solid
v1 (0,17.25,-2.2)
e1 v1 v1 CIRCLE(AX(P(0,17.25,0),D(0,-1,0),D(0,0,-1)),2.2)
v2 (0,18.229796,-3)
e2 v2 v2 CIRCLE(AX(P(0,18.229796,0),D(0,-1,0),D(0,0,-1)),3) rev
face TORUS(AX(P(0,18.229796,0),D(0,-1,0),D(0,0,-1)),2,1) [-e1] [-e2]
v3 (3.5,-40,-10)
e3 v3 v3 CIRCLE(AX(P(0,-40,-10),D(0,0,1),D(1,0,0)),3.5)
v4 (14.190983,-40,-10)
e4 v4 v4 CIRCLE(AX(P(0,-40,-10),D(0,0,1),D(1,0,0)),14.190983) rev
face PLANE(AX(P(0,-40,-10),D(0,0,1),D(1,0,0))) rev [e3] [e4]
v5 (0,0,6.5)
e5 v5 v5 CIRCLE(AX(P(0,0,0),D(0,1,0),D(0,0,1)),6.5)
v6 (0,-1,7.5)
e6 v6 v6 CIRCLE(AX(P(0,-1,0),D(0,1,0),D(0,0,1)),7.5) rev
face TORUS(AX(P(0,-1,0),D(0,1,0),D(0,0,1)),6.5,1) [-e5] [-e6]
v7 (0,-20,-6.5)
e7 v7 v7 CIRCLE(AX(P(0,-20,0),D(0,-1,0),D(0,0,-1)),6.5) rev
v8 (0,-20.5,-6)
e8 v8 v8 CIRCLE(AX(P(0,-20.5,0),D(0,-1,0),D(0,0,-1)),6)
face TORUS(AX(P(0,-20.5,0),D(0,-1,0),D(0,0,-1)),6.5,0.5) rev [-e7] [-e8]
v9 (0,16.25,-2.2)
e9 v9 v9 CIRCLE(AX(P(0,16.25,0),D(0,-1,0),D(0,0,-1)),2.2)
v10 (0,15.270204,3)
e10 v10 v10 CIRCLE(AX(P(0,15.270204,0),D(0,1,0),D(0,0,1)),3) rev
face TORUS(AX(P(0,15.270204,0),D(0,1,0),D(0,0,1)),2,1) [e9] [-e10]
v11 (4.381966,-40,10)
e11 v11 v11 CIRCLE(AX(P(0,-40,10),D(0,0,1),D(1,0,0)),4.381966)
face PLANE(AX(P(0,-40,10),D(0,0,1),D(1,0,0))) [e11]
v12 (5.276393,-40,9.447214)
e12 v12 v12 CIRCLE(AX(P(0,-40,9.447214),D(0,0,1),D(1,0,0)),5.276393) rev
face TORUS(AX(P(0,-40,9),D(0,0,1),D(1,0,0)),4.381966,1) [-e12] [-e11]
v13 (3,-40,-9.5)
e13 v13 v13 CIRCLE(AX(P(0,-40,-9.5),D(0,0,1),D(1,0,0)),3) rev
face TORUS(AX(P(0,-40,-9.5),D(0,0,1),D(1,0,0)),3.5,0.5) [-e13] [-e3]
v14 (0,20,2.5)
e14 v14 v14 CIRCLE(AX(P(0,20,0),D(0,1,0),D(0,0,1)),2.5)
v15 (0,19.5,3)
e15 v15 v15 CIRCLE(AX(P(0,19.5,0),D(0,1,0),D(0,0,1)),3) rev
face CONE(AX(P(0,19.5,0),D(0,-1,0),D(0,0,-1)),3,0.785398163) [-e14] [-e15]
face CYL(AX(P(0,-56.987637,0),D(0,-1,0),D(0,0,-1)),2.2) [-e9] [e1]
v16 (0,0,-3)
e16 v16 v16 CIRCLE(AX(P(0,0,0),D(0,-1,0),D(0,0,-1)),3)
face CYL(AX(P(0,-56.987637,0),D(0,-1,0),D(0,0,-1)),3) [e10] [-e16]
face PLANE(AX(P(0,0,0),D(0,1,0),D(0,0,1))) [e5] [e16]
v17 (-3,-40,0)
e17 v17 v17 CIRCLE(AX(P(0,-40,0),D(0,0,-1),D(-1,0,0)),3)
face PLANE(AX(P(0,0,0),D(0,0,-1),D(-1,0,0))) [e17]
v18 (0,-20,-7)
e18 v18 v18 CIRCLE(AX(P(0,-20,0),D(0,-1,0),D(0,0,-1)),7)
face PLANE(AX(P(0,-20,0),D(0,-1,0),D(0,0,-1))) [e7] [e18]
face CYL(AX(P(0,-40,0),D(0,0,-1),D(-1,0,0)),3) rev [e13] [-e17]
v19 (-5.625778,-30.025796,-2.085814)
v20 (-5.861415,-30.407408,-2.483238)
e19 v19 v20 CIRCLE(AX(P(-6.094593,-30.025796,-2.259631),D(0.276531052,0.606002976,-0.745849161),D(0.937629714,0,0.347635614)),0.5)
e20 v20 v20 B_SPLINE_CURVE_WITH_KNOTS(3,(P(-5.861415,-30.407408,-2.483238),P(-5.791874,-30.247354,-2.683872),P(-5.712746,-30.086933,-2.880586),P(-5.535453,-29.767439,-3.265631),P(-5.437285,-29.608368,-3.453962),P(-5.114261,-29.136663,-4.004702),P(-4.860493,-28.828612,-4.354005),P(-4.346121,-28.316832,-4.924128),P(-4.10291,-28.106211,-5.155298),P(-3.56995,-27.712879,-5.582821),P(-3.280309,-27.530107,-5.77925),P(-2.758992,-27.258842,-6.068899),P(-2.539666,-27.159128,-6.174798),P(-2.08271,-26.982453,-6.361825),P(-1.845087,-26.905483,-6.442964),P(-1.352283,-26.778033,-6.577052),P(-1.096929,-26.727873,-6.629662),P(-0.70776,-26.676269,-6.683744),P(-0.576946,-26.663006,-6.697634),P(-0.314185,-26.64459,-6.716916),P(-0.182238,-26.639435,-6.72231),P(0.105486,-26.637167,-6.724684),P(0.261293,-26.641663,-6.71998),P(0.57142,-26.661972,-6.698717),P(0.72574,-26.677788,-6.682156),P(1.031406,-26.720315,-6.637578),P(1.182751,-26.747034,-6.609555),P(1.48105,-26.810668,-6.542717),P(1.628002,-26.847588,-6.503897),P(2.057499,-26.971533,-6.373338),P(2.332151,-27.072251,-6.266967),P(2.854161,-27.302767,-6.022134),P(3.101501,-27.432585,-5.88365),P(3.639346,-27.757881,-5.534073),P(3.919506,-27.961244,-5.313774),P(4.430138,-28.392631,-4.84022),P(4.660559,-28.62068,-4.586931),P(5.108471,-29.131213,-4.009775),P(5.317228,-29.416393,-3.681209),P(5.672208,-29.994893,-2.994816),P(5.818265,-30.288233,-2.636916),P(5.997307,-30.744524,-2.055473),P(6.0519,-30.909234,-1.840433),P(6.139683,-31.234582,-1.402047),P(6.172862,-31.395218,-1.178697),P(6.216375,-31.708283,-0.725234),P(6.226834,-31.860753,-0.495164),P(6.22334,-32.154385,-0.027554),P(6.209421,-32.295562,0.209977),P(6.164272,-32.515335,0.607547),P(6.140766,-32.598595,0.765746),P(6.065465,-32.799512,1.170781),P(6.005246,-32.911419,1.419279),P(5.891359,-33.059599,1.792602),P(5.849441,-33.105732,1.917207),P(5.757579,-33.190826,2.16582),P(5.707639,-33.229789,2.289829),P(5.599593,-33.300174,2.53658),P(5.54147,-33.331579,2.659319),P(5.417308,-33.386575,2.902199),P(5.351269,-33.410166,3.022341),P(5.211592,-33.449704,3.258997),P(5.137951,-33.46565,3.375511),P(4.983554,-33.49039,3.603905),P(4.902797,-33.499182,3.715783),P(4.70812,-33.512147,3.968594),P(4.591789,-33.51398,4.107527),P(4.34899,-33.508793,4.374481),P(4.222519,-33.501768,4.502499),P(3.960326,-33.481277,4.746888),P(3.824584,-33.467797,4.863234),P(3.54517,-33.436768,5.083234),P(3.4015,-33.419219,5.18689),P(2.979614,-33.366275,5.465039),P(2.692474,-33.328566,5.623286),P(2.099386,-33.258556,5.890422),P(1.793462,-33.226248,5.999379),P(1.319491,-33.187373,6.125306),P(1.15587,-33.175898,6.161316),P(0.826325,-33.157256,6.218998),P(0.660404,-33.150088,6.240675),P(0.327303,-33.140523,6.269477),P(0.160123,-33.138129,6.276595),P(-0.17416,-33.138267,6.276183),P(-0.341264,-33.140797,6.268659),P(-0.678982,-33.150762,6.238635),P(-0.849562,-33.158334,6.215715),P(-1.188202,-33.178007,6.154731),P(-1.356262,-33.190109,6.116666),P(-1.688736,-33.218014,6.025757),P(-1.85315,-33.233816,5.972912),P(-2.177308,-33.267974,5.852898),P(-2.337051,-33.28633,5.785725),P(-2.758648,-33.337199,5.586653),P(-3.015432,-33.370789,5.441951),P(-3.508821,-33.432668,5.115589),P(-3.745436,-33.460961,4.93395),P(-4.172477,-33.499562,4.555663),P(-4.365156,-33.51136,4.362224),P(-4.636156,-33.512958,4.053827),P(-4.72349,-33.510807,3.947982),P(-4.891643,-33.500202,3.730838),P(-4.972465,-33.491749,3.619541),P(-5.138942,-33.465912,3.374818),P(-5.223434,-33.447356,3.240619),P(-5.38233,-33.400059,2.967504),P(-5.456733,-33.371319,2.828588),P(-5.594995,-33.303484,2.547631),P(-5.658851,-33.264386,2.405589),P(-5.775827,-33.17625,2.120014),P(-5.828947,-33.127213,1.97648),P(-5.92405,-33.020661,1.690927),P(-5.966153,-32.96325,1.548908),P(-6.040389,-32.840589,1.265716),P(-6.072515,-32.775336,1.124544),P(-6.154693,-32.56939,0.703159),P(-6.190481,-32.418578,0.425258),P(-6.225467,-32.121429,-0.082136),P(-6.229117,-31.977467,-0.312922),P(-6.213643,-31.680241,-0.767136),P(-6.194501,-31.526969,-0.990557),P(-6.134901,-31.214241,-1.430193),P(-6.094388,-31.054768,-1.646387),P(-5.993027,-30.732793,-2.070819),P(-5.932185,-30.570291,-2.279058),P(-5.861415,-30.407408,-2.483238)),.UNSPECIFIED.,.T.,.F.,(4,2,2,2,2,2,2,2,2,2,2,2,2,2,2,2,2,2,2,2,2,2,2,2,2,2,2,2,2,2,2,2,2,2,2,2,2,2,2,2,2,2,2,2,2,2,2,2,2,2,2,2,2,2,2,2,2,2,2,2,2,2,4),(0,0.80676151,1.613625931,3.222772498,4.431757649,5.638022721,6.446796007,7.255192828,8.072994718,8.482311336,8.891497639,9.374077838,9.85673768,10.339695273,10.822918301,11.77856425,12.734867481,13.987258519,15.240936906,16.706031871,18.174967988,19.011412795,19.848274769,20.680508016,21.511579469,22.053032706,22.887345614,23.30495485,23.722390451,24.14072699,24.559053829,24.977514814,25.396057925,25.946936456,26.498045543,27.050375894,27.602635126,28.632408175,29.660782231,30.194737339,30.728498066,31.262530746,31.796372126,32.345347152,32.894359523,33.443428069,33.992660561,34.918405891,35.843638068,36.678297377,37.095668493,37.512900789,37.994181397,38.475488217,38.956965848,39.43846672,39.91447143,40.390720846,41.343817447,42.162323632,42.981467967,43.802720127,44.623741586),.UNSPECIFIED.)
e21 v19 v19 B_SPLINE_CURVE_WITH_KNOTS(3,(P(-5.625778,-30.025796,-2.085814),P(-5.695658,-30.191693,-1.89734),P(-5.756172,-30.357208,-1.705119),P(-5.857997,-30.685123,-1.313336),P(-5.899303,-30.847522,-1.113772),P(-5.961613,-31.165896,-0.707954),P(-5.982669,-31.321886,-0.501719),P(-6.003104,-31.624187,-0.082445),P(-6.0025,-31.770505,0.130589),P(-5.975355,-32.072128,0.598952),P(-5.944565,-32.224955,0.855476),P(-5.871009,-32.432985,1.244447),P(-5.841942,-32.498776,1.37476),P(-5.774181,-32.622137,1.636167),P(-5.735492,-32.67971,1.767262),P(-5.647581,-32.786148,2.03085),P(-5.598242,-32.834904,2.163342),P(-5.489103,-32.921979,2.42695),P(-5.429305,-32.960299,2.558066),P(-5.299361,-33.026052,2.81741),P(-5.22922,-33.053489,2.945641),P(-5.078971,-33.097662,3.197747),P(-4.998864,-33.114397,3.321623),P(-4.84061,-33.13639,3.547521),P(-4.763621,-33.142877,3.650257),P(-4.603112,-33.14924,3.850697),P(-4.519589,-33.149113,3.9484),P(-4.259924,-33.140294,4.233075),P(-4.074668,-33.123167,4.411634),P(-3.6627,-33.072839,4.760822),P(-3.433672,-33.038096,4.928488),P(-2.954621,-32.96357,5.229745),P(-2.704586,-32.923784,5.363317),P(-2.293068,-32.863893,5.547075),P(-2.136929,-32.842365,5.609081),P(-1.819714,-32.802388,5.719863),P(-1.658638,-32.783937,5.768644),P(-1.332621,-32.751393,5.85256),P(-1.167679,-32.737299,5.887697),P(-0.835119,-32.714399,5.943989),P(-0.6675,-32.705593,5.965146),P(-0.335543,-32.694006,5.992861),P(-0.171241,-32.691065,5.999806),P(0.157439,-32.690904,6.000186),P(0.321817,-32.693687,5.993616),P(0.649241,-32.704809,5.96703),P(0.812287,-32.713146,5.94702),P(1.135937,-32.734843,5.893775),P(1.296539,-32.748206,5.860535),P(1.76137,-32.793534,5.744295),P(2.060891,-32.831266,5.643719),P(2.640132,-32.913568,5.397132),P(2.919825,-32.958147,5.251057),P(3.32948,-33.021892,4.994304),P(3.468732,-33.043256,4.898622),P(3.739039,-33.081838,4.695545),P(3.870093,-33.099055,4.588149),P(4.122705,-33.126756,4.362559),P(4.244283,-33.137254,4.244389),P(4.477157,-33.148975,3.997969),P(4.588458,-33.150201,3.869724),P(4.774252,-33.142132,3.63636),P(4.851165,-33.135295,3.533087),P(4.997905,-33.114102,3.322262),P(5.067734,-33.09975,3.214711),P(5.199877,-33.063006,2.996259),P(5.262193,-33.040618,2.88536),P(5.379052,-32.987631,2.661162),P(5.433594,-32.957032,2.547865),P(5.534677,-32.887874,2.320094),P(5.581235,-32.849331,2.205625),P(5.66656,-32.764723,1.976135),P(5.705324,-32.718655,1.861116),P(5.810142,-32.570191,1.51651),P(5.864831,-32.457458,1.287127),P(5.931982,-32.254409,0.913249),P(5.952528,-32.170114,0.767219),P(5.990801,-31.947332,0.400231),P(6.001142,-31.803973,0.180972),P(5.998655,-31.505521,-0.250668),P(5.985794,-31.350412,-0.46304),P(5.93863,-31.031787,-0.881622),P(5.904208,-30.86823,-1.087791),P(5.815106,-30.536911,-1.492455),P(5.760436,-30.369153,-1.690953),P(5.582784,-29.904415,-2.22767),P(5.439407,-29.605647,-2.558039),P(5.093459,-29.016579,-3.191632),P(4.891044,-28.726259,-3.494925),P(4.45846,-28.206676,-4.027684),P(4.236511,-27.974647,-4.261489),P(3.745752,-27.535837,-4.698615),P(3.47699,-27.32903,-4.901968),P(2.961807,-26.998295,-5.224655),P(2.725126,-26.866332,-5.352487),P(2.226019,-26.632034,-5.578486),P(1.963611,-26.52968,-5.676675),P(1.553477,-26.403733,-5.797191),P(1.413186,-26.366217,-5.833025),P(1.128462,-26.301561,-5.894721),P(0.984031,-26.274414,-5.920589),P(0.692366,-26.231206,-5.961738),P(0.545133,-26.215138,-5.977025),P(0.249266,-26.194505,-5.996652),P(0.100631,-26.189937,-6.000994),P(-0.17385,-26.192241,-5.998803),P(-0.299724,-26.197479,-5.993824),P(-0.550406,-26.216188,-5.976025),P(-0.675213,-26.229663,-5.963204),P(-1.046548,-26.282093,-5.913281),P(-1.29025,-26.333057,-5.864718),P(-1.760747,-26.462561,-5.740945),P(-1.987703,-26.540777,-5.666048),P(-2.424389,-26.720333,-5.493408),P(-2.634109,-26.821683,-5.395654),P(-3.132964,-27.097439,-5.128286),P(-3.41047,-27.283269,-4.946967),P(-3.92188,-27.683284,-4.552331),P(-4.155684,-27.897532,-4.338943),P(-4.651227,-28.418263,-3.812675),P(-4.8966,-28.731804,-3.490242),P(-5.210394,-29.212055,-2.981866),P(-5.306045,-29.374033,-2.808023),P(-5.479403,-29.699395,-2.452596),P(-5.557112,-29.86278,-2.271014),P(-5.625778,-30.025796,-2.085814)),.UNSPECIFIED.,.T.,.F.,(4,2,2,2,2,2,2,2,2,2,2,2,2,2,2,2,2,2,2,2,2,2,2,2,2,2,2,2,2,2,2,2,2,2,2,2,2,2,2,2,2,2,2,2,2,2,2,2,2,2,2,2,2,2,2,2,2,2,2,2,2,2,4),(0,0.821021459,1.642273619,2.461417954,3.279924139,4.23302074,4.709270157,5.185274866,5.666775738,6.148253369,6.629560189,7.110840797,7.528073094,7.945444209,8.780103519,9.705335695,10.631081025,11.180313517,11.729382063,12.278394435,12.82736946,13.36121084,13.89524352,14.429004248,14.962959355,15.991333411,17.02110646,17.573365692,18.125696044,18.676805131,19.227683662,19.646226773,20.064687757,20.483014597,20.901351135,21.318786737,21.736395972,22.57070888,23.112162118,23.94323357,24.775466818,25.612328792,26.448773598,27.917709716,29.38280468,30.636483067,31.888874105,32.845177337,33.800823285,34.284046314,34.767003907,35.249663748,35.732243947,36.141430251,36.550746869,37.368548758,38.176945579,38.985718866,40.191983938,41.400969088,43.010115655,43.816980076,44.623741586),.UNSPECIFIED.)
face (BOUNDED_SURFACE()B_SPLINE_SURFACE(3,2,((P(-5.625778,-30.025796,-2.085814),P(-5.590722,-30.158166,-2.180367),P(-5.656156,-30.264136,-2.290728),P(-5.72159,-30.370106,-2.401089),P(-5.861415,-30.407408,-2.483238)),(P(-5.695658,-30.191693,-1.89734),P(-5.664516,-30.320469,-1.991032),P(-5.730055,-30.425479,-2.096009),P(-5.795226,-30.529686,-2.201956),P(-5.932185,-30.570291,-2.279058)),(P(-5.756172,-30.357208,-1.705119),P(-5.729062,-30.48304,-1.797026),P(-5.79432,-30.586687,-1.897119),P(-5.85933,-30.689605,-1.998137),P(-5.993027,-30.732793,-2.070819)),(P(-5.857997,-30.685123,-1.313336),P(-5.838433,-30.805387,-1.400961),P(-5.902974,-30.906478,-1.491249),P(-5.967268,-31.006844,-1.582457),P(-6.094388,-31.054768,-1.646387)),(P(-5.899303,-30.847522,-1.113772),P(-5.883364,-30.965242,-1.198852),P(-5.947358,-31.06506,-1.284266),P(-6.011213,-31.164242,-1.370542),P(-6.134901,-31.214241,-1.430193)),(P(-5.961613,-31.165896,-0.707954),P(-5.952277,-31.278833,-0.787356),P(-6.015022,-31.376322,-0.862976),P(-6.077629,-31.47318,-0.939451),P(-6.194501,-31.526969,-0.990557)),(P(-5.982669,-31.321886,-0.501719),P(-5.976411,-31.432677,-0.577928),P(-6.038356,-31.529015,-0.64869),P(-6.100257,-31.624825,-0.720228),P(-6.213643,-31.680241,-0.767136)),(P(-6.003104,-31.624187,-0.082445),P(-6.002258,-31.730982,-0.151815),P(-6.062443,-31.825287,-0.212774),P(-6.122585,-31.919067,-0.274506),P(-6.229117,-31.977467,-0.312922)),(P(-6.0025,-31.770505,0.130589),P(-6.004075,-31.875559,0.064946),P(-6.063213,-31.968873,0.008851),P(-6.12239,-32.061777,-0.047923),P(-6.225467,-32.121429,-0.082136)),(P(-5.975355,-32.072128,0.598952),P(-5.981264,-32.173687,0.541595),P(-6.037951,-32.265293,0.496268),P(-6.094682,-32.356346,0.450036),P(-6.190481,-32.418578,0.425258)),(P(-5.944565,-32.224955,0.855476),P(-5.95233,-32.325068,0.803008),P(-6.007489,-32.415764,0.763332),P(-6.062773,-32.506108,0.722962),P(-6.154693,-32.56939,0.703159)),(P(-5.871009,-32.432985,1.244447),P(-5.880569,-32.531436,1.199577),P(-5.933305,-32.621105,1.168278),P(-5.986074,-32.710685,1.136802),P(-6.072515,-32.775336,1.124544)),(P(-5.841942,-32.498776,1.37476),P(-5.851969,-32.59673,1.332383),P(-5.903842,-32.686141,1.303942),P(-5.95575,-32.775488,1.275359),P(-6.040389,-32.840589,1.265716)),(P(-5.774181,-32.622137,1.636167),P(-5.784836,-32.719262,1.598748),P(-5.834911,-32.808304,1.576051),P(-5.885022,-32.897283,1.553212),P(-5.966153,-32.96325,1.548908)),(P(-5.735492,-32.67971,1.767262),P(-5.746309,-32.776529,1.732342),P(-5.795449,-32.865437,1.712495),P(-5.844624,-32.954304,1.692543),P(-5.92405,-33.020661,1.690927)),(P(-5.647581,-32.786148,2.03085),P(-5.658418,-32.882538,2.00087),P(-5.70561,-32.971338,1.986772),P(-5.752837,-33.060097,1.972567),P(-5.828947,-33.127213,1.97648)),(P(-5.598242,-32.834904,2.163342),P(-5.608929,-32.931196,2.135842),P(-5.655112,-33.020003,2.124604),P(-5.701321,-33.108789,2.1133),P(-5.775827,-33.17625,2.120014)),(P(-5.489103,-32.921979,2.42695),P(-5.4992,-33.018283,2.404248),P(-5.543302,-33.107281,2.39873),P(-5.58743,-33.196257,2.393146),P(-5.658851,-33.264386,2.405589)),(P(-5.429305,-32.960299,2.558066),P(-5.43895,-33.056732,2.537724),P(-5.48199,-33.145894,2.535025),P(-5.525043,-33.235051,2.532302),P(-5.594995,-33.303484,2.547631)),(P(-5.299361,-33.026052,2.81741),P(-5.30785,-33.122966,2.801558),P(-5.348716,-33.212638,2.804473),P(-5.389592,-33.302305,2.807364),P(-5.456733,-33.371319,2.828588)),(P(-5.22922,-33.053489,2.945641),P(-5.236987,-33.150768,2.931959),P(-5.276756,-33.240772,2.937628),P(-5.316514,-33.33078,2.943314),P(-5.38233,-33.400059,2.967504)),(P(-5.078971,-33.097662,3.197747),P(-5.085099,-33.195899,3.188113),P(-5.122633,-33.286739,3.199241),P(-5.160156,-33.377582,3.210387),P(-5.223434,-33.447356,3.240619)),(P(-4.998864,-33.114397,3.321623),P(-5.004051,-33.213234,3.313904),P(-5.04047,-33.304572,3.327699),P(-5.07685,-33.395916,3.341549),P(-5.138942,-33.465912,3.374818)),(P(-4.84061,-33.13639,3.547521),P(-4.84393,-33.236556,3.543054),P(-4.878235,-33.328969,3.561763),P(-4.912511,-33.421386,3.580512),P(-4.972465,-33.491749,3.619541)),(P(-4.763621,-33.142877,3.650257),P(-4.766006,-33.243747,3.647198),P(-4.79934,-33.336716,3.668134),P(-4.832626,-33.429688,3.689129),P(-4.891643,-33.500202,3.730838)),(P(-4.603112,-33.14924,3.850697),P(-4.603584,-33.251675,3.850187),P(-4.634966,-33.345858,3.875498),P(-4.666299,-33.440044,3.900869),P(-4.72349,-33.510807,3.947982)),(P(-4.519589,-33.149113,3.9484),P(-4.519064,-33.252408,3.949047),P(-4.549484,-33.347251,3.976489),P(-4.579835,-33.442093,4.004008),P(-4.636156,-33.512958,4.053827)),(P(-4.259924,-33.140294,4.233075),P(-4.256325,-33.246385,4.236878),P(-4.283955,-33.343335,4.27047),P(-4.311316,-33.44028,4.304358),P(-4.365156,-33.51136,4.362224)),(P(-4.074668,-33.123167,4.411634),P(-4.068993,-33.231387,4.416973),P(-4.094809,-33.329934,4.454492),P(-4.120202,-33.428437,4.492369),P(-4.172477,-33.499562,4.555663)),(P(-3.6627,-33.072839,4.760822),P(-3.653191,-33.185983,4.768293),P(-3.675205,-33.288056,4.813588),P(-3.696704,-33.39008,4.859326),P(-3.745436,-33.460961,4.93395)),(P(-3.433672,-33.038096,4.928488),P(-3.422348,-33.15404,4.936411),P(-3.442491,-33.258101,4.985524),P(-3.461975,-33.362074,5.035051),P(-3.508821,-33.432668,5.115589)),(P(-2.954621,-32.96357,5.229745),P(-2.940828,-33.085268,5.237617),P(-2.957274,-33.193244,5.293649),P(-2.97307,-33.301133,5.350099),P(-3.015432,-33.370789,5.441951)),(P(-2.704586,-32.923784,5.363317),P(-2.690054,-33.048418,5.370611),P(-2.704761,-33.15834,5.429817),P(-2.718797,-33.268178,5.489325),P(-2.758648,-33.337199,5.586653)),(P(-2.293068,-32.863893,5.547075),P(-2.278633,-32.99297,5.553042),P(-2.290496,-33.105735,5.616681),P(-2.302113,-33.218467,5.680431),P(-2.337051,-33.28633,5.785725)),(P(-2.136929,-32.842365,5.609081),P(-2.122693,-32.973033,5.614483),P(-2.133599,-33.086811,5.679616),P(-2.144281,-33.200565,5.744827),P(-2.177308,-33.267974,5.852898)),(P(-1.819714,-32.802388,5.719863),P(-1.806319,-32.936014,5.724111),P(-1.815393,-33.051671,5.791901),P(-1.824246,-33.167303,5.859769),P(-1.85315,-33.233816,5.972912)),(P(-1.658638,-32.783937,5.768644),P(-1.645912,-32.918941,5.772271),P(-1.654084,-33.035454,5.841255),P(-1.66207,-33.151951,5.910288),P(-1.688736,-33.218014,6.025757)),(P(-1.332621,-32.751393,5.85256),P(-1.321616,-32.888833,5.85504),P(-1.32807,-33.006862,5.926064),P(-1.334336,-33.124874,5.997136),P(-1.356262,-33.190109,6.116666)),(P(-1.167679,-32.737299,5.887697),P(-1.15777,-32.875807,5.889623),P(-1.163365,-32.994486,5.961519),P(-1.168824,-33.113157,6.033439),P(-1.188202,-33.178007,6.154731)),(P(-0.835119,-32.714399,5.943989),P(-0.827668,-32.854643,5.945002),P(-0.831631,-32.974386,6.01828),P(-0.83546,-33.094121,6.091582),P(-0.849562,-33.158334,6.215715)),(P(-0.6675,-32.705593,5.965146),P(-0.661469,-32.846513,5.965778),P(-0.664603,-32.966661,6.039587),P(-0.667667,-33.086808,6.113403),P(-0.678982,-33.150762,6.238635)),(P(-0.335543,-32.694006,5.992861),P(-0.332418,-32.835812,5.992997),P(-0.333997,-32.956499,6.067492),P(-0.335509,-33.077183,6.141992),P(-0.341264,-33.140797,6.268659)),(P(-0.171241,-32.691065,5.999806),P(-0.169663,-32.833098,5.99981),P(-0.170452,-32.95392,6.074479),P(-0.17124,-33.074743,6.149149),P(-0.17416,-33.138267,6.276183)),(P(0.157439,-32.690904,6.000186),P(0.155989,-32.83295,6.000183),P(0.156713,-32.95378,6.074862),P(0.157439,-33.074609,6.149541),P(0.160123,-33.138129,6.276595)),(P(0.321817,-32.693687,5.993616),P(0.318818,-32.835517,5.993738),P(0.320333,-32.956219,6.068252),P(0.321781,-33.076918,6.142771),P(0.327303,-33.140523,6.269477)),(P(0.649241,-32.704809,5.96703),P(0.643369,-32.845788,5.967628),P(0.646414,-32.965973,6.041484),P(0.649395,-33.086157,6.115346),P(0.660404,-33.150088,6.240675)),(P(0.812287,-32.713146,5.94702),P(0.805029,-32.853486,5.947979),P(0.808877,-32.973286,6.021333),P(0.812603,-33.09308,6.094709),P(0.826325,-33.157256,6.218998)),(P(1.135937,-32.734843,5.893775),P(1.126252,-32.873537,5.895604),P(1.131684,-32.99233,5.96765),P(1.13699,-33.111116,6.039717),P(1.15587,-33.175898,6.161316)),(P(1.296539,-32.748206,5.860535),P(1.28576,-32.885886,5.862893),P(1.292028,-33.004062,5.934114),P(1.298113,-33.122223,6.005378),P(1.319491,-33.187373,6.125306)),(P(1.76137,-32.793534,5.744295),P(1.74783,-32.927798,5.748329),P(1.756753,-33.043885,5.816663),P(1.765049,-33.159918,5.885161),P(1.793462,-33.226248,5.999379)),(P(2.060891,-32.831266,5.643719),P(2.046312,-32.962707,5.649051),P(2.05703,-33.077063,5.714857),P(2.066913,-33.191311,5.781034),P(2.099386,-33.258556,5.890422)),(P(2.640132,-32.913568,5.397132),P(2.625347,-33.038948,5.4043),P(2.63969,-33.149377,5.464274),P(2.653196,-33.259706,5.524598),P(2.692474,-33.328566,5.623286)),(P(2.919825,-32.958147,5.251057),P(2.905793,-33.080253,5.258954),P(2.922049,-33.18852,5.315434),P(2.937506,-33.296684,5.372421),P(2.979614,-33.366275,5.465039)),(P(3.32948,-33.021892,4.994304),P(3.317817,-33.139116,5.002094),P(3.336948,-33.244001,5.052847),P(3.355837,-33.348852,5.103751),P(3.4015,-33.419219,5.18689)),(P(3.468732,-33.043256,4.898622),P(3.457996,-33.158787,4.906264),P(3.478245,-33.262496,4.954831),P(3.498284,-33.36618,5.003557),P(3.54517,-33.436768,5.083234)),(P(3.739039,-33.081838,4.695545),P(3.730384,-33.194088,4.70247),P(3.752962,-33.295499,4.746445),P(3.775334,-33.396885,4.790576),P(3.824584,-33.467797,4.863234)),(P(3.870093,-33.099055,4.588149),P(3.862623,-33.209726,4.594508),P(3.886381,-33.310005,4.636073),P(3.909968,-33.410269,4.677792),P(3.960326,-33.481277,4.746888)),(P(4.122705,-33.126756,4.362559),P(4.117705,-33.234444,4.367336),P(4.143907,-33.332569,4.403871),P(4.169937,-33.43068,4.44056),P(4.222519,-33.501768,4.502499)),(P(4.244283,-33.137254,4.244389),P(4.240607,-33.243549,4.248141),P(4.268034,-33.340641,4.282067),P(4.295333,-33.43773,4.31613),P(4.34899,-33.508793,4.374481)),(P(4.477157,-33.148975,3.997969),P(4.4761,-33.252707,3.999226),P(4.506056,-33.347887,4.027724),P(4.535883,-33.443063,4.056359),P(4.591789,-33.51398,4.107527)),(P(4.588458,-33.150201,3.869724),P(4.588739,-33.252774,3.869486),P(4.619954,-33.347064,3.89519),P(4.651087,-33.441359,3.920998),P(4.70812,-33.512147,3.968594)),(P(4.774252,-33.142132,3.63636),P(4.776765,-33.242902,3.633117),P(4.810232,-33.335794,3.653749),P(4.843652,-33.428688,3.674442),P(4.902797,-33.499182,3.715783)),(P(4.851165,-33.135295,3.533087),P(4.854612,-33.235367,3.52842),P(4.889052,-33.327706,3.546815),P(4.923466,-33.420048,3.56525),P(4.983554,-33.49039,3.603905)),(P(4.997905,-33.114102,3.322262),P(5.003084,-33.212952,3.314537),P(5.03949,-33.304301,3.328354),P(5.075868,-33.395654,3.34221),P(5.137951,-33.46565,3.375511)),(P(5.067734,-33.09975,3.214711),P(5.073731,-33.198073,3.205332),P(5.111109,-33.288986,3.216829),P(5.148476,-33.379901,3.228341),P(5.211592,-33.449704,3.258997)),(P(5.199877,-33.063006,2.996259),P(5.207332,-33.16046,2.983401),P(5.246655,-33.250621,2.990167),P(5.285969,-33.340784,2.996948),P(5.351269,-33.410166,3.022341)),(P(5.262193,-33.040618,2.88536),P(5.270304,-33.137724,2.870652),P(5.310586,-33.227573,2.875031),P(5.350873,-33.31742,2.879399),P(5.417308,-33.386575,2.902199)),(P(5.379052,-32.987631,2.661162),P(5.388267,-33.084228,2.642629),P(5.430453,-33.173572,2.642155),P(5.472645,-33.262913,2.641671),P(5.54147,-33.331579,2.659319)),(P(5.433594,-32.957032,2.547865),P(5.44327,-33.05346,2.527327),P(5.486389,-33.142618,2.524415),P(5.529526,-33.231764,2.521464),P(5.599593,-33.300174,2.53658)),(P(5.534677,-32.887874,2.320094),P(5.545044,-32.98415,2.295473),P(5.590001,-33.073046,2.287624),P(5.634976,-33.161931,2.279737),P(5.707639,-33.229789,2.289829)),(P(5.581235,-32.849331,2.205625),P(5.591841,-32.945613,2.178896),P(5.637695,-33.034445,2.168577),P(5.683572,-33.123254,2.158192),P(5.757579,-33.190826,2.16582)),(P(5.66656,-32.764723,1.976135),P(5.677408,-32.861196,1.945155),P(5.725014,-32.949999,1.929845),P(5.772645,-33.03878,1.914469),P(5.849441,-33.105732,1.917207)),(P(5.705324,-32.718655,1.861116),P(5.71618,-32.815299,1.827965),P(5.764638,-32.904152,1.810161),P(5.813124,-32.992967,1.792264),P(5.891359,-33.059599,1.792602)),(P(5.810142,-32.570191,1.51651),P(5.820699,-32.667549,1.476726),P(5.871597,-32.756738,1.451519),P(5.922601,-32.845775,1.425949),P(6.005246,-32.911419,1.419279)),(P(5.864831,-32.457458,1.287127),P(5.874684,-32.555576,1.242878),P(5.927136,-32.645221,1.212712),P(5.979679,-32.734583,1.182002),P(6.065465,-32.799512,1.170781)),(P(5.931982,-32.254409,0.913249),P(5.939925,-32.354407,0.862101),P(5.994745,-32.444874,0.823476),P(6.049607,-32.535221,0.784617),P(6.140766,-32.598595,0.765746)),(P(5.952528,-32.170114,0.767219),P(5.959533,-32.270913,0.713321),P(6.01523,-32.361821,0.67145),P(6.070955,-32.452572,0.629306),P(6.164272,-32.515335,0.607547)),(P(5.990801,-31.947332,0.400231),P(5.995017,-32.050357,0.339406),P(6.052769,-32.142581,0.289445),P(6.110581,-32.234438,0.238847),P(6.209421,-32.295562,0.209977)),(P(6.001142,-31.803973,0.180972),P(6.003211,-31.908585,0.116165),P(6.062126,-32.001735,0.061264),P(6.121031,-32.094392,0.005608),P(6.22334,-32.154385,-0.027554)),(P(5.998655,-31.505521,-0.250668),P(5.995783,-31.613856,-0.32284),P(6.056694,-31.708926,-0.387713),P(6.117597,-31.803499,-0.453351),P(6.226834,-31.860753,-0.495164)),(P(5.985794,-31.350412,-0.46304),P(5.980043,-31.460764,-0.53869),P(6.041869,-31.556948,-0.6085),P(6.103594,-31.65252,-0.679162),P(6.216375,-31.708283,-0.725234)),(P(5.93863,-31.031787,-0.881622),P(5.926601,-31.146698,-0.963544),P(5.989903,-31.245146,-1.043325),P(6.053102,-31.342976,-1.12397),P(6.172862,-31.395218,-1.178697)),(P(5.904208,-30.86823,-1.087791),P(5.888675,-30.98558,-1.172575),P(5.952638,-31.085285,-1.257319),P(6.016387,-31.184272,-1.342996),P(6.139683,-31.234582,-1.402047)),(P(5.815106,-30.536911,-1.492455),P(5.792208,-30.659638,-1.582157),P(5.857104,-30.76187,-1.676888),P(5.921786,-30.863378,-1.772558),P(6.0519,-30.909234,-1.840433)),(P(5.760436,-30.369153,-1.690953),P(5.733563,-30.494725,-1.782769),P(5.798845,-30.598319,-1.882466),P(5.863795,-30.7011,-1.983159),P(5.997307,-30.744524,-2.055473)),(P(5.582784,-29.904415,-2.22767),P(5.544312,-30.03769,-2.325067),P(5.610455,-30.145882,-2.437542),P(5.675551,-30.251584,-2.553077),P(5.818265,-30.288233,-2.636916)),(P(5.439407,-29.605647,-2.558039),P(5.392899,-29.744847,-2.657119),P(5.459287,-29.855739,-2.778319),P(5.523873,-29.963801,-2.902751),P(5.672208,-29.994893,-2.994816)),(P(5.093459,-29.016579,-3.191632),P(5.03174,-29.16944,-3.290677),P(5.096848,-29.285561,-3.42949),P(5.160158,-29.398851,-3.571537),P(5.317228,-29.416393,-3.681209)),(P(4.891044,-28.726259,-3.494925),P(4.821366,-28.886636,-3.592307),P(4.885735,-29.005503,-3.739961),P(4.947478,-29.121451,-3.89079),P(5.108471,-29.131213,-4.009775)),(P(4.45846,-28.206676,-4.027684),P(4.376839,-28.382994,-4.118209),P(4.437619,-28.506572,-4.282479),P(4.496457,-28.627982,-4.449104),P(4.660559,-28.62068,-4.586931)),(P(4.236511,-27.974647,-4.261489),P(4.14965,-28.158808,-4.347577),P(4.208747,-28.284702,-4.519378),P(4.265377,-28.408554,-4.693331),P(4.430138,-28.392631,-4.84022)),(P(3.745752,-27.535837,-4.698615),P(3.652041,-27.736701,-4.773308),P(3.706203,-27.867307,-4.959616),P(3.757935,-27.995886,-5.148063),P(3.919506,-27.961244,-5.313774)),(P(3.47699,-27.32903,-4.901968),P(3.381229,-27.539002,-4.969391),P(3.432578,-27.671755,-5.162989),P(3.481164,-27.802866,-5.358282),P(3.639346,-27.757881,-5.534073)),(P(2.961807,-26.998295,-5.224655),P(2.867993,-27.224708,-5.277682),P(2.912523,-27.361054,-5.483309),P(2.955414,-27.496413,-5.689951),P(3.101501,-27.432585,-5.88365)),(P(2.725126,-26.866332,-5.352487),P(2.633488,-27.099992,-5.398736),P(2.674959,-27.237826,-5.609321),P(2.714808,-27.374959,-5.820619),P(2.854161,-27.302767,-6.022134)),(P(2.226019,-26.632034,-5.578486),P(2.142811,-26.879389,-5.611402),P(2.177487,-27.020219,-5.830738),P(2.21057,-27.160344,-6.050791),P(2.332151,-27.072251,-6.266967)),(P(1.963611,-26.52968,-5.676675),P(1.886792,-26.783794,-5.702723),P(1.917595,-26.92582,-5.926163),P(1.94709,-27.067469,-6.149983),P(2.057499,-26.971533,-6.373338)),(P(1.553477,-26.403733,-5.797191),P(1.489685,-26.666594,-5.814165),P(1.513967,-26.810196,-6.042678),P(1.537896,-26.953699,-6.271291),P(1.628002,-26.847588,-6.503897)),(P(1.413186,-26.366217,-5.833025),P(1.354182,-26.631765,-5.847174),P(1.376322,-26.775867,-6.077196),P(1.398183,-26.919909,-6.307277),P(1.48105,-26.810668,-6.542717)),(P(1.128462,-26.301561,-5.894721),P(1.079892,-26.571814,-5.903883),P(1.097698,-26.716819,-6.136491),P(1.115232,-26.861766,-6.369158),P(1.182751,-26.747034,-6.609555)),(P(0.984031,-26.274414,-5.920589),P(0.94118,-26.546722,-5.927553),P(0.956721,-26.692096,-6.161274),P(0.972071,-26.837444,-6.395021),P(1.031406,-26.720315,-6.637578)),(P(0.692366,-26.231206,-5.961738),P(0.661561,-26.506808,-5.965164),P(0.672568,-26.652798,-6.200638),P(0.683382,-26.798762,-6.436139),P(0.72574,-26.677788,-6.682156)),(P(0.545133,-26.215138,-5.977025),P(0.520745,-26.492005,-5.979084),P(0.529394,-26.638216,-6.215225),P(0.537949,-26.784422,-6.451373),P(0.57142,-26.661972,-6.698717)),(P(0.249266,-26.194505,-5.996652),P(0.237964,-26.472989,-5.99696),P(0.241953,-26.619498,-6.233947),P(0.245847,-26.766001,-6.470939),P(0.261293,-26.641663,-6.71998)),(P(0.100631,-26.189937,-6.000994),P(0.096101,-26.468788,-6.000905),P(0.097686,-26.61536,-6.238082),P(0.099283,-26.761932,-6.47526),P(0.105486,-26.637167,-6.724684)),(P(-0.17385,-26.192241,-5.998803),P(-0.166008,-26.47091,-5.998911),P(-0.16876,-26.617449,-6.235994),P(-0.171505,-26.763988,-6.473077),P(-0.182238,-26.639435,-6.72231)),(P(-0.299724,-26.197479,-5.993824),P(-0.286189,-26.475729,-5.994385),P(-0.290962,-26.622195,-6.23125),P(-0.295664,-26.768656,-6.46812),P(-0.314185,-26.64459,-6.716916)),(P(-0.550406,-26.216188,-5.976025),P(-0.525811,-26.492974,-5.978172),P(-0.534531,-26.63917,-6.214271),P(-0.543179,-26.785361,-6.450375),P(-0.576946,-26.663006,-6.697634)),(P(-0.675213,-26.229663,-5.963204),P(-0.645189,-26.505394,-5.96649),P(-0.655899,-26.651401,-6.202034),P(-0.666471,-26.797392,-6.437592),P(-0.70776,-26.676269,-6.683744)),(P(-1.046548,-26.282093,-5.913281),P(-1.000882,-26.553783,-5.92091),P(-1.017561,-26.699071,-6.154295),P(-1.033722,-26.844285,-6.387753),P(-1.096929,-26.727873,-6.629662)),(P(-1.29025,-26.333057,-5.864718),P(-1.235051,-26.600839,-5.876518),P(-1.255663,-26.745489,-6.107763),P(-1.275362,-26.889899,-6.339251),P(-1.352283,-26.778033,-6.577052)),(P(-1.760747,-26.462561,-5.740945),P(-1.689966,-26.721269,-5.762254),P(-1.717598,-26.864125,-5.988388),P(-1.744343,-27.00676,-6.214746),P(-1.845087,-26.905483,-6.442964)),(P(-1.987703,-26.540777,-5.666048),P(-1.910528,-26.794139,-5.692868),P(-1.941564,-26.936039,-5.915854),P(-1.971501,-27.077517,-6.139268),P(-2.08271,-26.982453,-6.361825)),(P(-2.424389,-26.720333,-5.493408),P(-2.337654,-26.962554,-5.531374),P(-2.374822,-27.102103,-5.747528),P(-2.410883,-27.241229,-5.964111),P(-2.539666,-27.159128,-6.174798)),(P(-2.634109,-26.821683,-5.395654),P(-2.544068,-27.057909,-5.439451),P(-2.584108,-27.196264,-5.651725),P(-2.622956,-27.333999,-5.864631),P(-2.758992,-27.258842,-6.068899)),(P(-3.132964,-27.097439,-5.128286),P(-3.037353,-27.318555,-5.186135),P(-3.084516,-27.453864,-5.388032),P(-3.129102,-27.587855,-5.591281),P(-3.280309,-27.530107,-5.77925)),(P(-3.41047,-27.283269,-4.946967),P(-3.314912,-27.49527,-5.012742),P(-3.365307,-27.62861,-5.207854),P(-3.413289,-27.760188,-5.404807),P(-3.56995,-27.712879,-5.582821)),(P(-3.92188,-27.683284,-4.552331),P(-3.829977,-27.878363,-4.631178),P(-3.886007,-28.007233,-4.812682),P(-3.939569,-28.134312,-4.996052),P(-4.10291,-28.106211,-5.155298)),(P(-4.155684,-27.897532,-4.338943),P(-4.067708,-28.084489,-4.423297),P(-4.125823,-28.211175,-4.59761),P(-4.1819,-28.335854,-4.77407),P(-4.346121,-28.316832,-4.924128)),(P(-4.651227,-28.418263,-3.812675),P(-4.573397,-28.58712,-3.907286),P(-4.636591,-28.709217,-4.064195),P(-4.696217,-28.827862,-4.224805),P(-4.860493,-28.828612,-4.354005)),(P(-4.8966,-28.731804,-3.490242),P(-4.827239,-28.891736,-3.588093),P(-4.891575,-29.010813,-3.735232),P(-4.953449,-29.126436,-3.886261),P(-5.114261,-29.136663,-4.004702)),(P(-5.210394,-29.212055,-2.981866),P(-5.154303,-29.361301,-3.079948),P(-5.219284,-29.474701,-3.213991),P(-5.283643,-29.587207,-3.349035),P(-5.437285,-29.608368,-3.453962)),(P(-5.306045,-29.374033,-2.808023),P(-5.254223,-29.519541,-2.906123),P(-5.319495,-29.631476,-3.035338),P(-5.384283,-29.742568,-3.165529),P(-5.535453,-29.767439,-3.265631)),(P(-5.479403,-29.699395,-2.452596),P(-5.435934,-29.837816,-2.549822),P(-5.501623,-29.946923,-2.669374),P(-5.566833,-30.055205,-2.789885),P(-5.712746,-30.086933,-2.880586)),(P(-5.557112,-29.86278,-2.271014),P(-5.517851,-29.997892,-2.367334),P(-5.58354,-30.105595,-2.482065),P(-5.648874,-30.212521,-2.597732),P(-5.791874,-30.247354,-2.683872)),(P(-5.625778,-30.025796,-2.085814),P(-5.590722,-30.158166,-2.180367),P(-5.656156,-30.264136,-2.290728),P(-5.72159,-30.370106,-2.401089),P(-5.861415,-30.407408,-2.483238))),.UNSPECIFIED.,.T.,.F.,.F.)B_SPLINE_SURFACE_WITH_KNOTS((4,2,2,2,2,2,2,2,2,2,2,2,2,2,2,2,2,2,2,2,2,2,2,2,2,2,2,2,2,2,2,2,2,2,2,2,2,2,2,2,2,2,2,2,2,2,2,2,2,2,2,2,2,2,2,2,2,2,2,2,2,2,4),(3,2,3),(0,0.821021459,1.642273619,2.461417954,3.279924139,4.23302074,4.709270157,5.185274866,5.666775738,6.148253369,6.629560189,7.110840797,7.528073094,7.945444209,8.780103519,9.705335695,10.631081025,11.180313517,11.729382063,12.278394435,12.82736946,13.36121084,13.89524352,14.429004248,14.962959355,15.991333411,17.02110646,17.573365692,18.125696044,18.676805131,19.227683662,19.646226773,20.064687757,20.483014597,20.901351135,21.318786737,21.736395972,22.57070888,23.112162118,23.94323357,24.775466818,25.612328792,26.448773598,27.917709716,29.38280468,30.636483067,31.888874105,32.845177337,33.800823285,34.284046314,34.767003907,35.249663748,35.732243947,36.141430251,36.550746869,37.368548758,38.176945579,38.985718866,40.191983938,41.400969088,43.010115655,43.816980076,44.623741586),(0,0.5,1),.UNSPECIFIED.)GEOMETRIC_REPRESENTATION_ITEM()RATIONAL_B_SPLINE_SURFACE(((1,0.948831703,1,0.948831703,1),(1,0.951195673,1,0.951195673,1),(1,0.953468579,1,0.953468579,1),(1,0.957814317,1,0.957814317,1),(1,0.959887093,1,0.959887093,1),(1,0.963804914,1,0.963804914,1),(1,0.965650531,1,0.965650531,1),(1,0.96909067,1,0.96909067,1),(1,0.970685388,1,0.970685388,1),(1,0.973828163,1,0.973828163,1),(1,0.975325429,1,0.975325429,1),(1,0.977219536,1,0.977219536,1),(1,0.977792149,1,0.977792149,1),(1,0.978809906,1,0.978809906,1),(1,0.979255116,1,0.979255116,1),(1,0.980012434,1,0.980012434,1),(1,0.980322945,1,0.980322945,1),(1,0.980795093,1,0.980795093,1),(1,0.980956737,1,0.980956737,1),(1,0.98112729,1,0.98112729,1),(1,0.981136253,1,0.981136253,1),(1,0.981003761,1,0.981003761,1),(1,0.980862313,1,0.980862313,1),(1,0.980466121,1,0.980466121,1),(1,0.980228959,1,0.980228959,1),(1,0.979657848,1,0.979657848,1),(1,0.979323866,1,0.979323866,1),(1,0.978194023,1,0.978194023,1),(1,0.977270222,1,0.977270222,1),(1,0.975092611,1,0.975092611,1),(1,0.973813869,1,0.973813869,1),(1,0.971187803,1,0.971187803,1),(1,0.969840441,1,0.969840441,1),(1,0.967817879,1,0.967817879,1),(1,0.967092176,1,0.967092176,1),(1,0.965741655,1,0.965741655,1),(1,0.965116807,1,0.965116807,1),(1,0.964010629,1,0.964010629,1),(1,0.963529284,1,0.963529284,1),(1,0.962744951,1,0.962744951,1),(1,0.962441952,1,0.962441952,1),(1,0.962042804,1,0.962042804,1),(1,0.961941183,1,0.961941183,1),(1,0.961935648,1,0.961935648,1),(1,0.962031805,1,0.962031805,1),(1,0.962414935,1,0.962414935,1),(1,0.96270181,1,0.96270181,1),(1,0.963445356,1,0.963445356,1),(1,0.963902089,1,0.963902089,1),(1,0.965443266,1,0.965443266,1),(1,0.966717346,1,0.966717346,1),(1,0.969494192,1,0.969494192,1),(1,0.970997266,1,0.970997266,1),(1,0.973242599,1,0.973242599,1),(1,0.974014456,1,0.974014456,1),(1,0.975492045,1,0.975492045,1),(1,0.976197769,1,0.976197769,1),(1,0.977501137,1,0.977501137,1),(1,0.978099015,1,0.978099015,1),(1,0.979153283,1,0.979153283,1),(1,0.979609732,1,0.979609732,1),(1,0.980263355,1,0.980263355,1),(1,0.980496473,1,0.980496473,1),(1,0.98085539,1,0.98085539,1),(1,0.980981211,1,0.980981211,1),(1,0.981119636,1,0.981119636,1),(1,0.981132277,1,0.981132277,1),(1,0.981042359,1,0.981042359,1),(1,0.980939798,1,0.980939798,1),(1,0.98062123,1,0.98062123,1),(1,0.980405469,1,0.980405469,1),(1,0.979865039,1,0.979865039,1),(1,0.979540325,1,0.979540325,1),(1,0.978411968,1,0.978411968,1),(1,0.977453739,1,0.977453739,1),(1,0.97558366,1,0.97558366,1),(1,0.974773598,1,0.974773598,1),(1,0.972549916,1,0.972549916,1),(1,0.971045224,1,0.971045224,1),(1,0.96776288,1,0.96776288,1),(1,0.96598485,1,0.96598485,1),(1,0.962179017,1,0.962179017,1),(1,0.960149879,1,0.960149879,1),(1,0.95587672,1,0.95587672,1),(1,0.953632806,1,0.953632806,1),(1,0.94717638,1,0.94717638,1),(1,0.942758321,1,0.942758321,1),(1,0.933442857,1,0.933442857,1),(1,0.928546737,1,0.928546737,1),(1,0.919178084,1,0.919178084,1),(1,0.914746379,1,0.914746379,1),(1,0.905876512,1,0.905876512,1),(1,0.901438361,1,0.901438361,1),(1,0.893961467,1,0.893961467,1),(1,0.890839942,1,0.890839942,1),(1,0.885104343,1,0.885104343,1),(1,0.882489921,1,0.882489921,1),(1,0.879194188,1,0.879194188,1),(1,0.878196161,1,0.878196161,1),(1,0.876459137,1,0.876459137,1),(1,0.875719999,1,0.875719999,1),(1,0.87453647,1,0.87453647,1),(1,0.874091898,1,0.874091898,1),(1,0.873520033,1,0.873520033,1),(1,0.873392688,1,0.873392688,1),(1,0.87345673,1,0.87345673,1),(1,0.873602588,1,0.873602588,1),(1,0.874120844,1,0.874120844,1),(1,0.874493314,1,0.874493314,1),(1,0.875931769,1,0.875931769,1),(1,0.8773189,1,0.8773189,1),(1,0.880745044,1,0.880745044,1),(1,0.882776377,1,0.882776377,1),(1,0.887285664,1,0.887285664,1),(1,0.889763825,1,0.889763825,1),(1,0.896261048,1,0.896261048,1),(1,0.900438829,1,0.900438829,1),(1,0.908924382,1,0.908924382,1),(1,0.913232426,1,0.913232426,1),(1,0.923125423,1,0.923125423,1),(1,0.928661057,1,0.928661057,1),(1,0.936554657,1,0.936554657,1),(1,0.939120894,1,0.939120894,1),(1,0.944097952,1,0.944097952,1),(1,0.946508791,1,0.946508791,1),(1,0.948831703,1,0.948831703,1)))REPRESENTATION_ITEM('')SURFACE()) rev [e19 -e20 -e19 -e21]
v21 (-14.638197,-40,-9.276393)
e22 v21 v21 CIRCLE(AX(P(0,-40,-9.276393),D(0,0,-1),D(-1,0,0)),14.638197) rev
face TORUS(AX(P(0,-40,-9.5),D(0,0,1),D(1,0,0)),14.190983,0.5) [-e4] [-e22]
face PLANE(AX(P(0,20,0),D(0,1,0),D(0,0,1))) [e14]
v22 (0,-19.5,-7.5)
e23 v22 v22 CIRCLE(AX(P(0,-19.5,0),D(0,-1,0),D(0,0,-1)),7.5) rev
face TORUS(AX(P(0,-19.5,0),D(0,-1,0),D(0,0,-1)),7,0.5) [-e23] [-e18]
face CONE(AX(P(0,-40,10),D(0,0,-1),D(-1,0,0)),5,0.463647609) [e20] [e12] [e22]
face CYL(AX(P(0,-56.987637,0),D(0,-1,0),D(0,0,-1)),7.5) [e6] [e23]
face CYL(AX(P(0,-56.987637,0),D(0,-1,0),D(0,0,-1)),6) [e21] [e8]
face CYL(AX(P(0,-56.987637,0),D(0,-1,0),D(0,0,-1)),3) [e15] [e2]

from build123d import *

# Parameters (mm, degrees)
SKETCH1_W          = 20
SKETCH1_H          = 6
SKETCH1_W_2        = 2.75
SKETCH1_H_2        = 3
CHAMFER1_SIZE      = 0.5
SKETCH4_R          = 3
CUT_EXTRUDE1_DEPTH = 10
FILLET2_R          = 0.5
FILLET1_R          = 1


# Read off the part's stored shape, not the designer's step: Boundary1
with BuildPart() as part:
    # Sketch1 → Revolve1 (revolve)
    with BuildSketch(Plane.YZ, mode=Mode.PRIVATE) as revolve1_sk:
        with Locations((-30, 3)):
            Rectangle(SKETCH1_W, SKETCH1_H)
        Polygon((-20, 0), (0, 0), (0, 3), (0, 7.5), (-20, 7.5), (-20, 6), align=None)
        Polygon((0, 0), (17.25, 0), (17.25, 2.2), (16.25, 2.2), (16.25, 3), (0, 3), align=None)
        with Locations((18.625, 1.5)):
            Rectangle(SKETCH1_W_2, SKETCH1_H_2)
    revolve(revolve1_sk.sketch.rotate(Axis((0, -56.987637363, 0), (0, 1, 0)), 180), axis=Axis((0, -56.987637363, 0), (0, 1, 0)))

    # Chamfer1
    chamfer1_edges = [part.edges().sort_by_distance(p)[0] for p in [
        (0, 20, 3),
    ]]
    chamfer(chamfer1_edges, length=CHAMFER1_SIZE)

    # Boundary1 outline → Boundary1 (revolve)
    with BuildSketch(Plane.XZ.offset(40)):
        Polygon((15, -10), (5, 10), (0, 10), (0, -10), align=None)
    revolve(axis=Axis((0, -40, 0), (0, 0, 1)))

    # Sketch4 → Cut-Extrude1 (cut)
    with BuildSketch(Plane(origin=(0, 0, -10), x_dir=(1, 0, 0), z_dir=(0, 0, -1))):
        with Locations(Location((0, 40, 0), (0, 0, 180))):
            Circle(SKETCH4_R)
    extrude(amount=-CUT_EXTRUDE1_DEPTH, mode=Mode.SUBTRACT)

    # Fillet2
    fillet2_edges = [part.edges().sort_by_distance(p)[0] for p in [
        (0, -20, 6),
        (0, -20, 7.5),
        (0, -33, 6),
        (-15, -40, -10),
        (3, -40, -10),
    ]]
    fillet(fillet2_edges, radius=FILLET2_R)

    # Fillet1
    # the kernel refuses this fillet: 1 mm, written as the material it takes off along each edge
    with BuildSketch(Plane(origin=(0, 0, 0), x_dir=(0, 0, -1), z_dir=(1, 0, 0))) as fillet1_piece_1:
        with BuildLine():
            CenterArc((7.5 - FILLET1_R, -FILLET1_R), FILLET1_R, 0, 90)
            Line((7.5 - FILLET1_R, 0), (7.5 - FILLET1_R, FILLET1_R * 0.02))
            Line((7.5 - FILLET1_R, FILLET1_R * 0.02), (7.5 + FILLET1_R * 0.02, FILLET1_R * 0.02))
            Line((7.5 + FILLET1_R * 0.02, FILLET1_R * 0.02), (7.5 + FILLET1_R * 0.02, -FILLET1_R))
            Line((7.5 + FILLET1_R * 0.02, -FILLET1_R), (7.5, -FILLET1_R))
        make_face()
    revolve(axis=Axis((0, 0, 0), (0, 1, 0)), mode=Mode.SUBTRACT)
    with BuildSketch(Plane(origin=(0, 16.25, 0), x_dir=(0, 0, -1), z_dir=(1, 0, 0))) as fillet1_piece_2:
        with BuildLine():
            CenterArc((2, -0.979795897), FILLET1_R, 0, 78.463040967)
            Line((2.2, 0), (2.204, 0.019595918))
            ThreePointArc((2.204, 0.019595918), (2.6, 0.02), (3, 0.02))
            Line((3, 0.02), (3.02, 0))
            Line((3.02, 0), (3.02, -0.979795897))
            Line((3.02, -0.979795897), (3, -0.979795897))
        make_face()
    revolve(axis=Axis((0, 16.25, 0), (0, 1, 0)), mode=Mode.SUBTRACT)
    with BuildSketch(Plane(origin=(0, 17.25, 0), x_dir=(0, 0, -1), z_dir=(1, 0, 0))) as fillet1_piece_3:
        with BuildLine():
            CenterArc((2, 0.979795897), FILLET1_R, 281.536959033, 78.463040967)
            Line((3, 0.979795897), (3.02, 0.979795897))
            Line((3.02, 0.979795897), (3.02, 0))
            Line((3.02, 0), (3, -0.02))
            ThreePointArc((3, -0.02), (2.6, -0.02), (2.204, -0.019595918))
            Line((2.204, -0.019595918), (2.2, 0))
        make_face()
    revolve(axis=Axis((0, 17.25, 0), (0, 1, 0)), mode=Mode.SUBTRACT)
    with BuildSketch(Plane(origin=(0, -40, 10), x_dir=(1, 0, 0), z_dir=(0, -1, 0))) as fillet1_piece_4:
        with BuildLine():
            CenterArc((5 - FILLET1_R * 0.61803398875, -FILLET1_R), FILLET1_R, 26.565051177, 63.434948823)
            Line((5 - FILLET1_R * 0.61803398875, 0), (5 - FILLET1_R * 0.61803398875, FILLET1_R * 0.02))
            Line((5 - FILLET1_R * 0.61803398875, FILLET1_R * 0.02), (5 + FILLET1_R * 0.012360679775, FILLET1_R * 0.02))
            Line((5 + FILLET1_R * 0.012360679775, FILLET1_R * 0.02), (5 + FILLET1_R * 0.29428174607, -FILLET1_R * 0.54384213259))
            Line((5 + FILLET1_R * 0.29428174607, -FILLET1_R * 0.54384213259), (5 + FILLET1_R * 0.27639320225, -FILLET1_R * 0.5527864045))
        make_face()
    revolve(axis=Axis((0, -40, 10), (0, 0, 1)), mode=Mode.SUBTRACT)


solid = part.part
